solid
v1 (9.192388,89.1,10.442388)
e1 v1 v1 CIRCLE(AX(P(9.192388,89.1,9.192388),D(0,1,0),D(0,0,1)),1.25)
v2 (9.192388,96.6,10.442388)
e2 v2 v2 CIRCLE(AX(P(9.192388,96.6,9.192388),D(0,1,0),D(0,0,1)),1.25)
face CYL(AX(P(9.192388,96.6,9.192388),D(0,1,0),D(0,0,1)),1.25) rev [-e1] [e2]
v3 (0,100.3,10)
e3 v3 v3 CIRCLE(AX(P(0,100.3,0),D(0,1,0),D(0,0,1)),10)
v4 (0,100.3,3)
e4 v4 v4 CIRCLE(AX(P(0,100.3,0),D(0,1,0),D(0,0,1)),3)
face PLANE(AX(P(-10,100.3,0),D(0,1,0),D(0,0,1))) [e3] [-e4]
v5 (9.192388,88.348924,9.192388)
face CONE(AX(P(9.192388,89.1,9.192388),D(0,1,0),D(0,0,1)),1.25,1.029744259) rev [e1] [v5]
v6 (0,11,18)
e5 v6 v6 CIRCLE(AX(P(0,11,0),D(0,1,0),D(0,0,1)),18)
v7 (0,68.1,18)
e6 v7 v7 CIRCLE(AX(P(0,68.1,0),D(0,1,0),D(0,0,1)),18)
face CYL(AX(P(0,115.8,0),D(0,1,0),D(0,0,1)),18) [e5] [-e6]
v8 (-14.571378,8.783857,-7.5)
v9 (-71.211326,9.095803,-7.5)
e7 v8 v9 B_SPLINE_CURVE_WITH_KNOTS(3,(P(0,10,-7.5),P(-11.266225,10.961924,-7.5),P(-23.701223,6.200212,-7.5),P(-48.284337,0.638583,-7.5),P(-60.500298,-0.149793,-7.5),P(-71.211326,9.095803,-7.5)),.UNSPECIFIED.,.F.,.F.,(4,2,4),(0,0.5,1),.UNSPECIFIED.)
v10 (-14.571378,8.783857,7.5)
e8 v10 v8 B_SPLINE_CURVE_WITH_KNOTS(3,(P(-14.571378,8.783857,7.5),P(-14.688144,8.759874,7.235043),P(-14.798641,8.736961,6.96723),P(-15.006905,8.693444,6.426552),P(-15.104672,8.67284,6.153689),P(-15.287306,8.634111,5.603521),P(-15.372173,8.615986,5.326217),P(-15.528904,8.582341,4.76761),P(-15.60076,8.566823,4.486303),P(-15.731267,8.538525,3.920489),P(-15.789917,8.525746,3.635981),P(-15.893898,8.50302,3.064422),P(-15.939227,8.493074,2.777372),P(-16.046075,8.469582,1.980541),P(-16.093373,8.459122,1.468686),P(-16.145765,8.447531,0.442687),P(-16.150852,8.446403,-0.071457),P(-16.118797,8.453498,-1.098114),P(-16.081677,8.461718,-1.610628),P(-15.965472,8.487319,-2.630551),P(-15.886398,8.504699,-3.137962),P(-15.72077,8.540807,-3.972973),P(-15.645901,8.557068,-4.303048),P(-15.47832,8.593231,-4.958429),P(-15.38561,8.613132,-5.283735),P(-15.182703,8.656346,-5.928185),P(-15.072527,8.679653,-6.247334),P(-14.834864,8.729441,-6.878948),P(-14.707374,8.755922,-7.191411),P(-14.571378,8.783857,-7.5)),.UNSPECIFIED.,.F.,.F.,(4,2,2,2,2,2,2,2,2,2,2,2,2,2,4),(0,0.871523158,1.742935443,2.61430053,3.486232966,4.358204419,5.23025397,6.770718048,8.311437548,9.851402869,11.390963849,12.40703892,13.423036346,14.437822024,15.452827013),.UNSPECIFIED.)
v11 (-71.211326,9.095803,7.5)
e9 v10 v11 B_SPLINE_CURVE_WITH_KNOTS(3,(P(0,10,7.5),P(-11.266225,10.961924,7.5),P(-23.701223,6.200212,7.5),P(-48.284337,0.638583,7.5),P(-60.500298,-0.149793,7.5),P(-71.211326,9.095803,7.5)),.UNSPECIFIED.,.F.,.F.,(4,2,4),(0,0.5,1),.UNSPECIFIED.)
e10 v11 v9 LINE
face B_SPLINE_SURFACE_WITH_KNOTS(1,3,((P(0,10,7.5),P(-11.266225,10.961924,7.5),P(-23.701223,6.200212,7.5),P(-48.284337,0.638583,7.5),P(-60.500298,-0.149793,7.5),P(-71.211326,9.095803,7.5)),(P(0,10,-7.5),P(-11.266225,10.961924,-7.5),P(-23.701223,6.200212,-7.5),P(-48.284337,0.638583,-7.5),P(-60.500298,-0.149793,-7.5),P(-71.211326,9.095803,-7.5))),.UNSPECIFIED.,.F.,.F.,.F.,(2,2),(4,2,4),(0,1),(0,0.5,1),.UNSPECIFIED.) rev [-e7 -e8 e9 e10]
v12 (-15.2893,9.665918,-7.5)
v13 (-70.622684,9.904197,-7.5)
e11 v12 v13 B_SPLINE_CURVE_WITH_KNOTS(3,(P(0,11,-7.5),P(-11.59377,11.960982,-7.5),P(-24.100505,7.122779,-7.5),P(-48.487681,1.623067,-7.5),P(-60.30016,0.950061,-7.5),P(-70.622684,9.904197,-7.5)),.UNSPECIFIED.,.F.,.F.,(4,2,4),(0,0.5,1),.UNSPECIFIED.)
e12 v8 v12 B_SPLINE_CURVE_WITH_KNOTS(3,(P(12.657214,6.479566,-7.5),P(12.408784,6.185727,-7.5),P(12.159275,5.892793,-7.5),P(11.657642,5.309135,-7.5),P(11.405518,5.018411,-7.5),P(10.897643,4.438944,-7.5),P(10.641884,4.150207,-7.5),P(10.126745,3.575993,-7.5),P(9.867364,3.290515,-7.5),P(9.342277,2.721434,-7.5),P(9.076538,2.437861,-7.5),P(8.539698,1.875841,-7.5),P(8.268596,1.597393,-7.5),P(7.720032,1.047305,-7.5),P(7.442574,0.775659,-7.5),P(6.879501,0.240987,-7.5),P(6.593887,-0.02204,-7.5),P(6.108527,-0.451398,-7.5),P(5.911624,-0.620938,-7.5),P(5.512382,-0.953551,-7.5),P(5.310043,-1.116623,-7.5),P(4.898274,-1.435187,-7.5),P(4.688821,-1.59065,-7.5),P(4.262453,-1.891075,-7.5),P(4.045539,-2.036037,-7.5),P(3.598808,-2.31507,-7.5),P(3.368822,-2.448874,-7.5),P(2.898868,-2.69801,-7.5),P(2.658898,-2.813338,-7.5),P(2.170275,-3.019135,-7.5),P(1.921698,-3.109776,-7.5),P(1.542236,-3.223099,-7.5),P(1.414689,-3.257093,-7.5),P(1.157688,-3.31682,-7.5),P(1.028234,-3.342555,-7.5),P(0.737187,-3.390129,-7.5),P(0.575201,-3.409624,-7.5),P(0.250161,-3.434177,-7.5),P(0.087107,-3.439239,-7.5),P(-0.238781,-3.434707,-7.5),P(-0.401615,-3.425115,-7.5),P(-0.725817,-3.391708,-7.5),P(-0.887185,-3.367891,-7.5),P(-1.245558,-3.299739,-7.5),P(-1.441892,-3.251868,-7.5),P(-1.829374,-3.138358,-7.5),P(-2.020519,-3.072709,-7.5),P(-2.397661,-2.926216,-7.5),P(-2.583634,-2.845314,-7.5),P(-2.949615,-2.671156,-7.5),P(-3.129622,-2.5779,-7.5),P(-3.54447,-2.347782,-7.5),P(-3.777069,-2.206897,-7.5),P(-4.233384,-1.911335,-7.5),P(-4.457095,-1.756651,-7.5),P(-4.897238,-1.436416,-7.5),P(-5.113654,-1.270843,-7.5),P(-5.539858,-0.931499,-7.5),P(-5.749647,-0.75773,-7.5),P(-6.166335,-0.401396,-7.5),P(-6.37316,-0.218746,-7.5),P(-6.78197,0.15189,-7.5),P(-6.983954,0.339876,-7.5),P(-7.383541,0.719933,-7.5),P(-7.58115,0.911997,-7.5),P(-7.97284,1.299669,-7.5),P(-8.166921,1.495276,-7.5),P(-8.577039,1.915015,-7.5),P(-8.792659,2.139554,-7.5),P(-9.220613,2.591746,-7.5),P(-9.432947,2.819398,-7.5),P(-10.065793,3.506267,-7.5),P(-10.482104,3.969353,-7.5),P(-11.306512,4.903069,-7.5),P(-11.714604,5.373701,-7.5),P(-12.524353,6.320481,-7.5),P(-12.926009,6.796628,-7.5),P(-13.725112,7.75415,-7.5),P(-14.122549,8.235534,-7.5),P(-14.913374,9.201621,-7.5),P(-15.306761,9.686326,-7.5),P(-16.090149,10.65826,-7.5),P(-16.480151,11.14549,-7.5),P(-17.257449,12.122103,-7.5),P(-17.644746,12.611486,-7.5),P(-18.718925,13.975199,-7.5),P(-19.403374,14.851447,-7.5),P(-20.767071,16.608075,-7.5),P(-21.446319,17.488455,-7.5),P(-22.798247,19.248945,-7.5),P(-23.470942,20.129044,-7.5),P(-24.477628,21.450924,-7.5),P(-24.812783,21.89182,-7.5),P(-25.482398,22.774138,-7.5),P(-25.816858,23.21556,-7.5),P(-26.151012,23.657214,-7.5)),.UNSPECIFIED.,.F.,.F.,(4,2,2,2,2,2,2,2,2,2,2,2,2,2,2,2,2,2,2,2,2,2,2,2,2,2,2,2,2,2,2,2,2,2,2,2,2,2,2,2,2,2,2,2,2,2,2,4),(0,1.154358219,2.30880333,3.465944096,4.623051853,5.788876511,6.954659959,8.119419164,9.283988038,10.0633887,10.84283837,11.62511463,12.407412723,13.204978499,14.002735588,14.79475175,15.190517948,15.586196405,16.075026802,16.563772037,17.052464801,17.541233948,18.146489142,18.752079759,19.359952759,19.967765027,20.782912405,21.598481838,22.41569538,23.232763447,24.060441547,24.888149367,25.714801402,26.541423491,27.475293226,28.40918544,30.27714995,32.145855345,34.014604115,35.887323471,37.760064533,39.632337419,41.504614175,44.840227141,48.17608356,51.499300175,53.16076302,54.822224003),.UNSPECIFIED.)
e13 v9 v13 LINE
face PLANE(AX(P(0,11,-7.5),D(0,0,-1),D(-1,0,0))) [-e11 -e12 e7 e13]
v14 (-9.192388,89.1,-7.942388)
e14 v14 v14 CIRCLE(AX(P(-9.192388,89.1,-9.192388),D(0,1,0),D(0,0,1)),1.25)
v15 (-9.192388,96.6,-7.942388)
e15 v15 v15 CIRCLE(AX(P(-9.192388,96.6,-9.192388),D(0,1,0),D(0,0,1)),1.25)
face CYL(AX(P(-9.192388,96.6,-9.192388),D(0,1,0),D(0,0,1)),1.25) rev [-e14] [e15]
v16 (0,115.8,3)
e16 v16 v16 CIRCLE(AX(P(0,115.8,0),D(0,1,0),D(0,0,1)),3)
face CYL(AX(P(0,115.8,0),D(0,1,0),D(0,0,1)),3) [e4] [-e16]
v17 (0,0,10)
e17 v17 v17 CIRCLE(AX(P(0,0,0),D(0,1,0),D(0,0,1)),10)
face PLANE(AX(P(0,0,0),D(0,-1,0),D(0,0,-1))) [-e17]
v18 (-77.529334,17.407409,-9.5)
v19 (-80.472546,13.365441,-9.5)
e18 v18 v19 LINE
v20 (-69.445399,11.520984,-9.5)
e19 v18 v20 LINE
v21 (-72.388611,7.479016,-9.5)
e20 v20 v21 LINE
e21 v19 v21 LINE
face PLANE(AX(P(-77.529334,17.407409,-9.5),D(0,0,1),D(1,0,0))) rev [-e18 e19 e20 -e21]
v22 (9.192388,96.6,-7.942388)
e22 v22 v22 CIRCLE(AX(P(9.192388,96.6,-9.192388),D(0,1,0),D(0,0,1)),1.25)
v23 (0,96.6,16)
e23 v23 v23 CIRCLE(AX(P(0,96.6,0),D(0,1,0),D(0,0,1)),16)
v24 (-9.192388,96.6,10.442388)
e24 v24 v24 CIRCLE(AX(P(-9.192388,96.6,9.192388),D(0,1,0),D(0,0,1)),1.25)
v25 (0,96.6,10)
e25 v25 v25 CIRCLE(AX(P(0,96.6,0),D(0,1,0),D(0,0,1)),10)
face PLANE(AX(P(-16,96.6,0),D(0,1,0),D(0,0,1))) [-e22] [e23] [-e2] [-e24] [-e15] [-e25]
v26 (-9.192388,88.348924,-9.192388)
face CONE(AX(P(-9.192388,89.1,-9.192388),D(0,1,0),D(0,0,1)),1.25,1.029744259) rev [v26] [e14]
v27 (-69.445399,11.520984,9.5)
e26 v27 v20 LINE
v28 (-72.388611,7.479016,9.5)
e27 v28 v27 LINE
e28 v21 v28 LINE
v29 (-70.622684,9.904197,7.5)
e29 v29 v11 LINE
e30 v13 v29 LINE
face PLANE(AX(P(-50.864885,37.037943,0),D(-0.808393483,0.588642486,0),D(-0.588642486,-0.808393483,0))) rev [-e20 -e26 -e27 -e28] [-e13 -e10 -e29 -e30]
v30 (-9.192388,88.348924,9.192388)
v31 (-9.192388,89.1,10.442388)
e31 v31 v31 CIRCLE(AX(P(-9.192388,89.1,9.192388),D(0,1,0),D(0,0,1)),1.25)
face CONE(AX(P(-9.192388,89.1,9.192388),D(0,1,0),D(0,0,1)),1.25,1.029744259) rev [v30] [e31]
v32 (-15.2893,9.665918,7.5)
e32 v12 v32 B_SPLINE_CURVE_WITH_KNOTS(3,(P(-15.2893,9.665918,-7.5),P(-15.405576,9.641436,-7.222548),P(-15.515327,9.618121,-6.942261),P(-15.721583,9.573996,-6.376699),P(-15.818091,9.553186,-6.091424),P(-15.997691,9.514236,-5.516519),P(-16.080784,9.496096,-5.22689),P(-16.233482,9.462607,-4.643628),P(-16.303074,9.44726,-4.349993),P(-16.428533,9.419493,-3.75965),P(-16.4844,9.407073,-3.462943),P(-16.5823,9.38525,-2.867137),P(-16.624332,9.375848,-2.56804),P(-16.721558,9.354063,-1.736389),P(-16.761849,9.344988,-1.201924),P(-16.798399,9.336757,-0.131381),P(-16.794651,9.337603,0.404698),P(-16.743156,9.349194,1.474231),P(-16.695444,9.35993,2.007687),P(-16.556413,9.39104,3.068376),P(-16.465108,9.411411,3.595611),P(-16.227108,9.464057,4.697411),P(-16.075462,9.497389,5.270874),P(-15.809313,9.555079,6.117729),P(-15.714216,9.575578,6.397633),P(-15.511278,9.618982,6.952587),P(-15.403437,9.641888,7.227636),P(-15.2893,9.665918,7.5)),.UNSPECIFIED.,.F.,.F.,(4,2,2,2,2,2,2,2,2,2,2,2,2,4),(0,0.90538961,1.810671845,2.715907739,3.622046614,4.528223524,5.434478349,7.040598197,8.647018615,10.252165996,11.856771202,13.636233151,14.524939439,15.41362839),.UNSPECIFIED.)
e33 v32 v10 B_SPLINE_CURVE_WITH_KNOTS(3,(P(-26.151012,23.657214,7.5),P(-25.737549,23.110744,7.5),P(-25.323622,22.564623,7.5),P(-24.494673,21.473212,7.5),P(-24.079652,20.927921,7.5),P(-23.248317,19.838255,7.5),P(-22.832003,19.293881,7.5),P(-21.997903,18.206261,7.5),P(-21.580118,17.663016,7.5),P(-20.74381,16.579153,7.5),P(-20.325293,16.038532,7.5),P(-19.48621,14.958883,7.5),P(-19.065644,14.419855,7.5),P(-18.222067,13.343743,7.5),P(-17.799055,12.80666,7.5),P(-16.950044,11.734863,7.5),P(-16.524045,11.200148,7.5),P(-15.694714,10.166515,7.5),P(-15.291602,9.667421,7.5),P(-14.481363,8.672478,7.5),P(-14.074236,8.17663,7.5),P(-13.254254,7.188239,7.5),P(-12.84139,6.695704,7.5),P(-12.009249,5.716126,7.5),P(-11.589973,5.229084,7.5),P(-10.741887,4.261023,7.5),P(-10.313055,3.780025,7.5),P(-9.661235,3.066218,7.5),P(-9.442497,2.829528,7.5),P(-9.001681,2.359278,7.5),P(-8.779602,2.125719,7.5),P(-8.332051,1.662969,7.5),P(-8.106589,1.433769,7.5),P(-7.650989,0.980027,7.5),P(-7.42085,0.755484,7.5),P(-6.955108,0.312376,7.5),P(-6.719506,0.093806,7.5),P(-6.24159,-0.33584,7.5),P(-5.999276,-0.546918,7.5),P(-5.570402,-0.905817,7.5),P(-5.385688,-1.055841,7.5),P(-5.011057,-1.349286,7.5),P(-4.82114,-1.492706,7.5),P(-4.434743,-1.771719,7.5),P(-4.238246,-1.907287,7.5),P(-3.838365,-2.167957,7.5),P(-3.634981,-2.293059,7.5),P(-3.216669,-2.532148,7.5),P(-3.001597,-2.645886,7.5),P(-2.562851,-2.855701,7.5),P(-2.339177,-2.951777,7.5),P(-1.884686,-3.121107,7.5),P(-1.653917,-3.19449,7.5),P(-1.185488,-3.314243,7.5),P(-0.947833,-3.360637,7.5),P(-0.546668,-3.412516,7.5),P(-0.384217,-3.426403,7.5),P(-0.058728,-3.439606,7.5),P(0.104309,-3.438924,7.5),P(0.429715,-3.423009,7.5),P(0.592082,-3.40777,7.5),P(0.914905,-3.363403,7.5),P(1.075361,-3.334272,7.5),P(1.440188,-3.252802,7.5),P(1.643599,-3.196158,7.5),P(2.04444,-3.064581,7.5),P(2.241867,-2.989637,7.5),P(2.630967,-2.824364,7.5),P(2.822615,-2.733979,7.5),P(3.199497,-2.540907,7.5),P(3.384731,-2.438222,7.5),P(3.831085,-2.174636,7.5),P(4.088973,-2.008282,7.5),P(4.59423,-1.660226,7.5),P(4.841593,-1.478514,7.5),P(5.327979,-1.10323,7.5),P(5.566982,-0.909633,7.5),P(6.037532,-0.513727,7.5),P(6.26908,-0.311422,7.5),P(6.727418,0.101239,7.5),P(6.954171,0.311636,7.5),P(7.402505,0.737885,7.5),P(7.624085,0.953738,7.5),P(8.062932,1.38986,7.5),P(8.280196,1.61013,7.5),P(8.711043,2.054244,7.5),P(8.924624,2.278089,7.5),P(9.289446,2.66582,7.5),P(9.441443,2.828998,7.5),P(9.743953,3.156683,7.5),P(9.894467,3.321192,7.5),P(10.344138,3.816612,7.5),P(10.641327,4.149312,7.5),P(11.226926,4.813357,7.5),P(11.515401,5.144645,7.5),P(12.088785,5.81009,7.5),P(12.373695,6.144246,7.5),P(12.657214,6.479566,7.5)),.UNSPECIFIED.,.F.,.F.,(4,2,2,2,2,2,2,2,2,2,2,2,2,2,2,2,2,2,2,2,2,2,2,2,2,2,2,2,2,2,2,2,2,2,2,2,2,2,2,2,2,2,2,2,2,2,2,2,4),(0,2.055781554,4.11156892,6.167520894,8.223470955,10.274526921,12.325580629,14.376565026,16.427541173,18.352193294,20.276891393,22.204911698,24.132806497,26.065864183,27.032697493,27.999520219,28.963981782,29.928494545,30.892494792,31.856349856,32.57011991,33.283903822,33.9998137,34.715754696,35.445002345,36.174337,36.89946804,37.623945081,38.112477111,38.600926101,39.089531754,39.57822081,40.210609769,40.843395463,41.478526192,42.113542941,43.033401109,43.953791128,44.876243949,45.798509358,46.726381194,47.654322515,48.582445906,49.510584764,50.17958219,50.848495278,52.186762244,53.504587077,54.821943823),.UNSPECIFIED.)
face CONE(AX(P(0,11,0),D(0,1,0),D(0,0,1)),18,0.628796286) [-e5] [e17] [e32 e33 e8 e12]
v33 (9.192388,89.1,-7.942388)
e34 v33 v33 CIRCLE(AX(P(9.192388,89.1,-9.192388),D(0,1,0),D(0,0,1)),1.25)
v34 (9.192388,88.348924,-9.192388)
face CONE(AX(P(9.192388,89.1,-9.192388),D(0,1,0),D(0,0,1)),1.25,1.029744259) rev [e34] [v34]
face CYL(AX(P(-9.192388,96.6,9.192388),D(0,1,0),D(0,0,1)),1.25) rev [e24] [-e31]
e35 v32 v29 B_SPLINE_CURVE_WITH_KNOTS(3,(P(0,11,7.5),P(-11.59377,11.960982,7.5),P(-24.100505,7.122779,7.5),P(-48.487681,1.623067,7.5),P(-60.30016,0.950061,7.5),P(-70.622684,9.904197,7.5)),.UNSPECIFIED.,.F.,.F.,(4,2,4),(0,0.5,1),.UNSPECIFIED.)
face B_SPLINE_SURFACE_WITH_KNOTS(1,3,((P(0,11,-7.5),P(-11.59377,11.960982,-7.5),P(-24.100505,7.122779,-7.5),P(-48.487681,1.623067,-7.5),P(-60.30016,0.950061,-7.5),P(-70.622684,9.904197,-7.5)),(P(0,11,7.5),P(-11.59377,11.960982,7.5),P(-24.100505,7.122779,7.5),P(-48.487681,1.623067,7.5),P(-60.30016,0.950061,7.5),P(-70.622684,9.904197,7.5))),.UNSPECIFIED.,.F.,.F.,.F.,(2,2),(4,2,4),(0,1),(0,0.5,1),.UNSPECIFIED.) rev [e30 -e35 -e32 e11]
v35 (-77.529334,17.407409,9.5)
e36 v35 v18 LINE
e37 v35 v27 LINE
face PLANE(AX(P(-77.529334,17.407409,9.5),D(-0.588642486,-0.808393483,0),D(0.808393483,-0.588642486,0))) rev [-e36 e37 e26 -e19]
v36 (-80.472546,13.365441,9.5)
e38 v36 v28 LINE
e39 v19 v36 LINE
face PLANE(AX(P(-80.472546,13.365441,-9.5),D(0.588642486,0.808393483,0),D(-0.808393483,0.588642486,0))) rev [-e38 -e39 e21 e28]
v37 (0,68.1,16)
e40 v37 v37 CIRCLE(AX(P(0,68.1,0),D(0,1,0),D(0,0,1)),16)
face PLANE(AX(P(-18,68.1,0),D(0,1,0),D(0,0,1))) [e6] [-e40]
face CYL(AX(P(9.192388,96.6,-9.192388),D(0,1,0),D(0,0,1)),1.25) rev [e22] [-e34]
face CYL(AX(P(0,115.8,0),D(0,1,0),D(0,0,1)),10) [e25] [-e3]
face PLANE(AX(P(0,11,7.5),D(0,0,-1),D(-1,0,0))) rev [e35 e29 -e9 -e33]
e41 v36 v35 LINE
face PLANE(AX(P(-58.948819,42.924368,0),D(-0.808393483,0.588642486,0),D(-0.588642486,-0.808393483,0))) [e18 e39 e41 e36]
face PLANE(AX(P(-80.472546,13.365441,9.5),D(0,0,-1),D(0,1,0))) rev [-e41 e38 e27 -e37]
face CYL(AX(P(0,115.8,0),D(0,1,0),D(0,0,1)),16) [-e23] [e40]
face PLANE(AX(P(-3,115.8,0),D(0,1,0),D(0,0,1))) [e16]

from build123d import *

# Parameters (mm, degrees)
SWEEP1_START              = -7.5
SWEEP1_DEPTH              = 15
SKETCH4_W                 = 19
SKETCH4_H                 = 5
BOSS_EXTRUDE1_DEPTH       = 10
M3X0_5_TAPPED_HOLE1_D     = 2.5
M3X0_5_TAPPED_HOLE1_DEPTH = 7.5
M3X0_5_TAPPED_HOLE1_TIP   = 0.751075774


with BuildPart() as part:
    # Sketch1 → Revolve1 (revolve)
    with BuildSketch(Plane.XY, mode=Mode.PRIVATE) as revolve1_sk:
        Polygon((0, 0), (-10, 0), (-18, 11), (-18, 68.1), (-16, 68.1), (-16, 96.6), (-10, 96.6), (-10, 100.3), (-3, 100.3), (-3, 115.8), (0, 115.8), align=None)
    revolve(revolve1_sk.sketch.rotate(Axis((0, 115.8, 0), (0, -1, 0)), 270), axis=Axis((0, 115.8, 0), (0, -1, 0)))

    # Sweep1: read off the stored shape, not the designer's step
    # Sweep1 outline → Sweep1 (add)
    with BuildSketch(Plane.XY.offset(SWEEP1_START)):
        with BuildLine():
            add(Edge.make_bspline(
                [(-15.28930073, 9.665917189), (-15.155241069, 9.50042506), (-15.020974619, 9.335100438), (-14.781588664, 9.041143621), (-14.67655559, 8.912441119), (-14.571379426, 8.783855646)],
                knots=[17.713260558, 17.713260558, 17.713260558, 17.713260558, 18.352193294, 18.352193294, 18.850555217, 18.850555217, 18.850555217, 18.850555217], degree=3))
            add(Edge.make_bspline(
                [(-15.28930073, 9.665917189), (-22.240343975, 8.202614741), (-29.318460029, 5.946043988), (-48.487680613, 1.623066579), (-60.300160331, 0.950060594), (-70.622683773, 9.904196742)],
                knots=[0.213963068, 0.213963068, 0.213963068, 0.213963068, 0.5, 0.5, 1, 1, 1, 1], degree=3))
            Line((-70.622683773, 9.904196742), (-71.211326259, 9.095803258))
            add(Edge.make_bspline(
                [(-14.571379426, 8.783855646), (-21.586501057, 7.343246642), (-28.814104178, 5.043485332), (-48.284336953, 0.638583113), (-60.500298128, -0.149792653), (-71.211326259, 9.095803258)],
                knots=[0.207983451, 0.207983451, 0.207983451, 0.207983451, 0.5, 0.5, 1, 1, 1, 1], degree=3))
        make_face()
    extrude(amount=SWEEP1_DEPTH)

    # Sketch4 → Boss-Extrude1 (add)
    with BuildSketch(Plane(origin=(-50.864884567, 37.037943446, 0), x_dir=(0, 0, 1), z_dir=(-0.8083934830959073, 0.5886424861391397, 0))):
        with Locations((0, -34.065024053)):
            Rectangle(SKETCH4_W, SKETCH4_H)
    extrude(amount=BOSS_EXTRUDE1_DEPTH)

    # M3x0.5 Tapped Hole1
    with Locations(Plane(origin=(0, 96.6, 0), x_dir=(1, 0, 0), z_dir=(0, 1, 0))):
        with Locations((9.192388155, 9.192388155), (9.192388155, -9.192388155), (-9.192388155, -9.192388155), (-9.192388155, 9.192388155)):
            Hole(M3X0_5_TAPPED_HOLE1_D / 2, depth=M3X0_5_TAPPED_HOLE1_DEPTH)
            with Locations((0, 0, -(M3X0_5_TAPPED_HOLE1_DEPTH + M3X0_5_TAPPED_HOLE1_TIP / 2))):  # 118° drill point
                Cone(0, M3X0_5_TAPPED_HOLE1_D / 2, M3X0_5_TAPPED_HOLE1_TIP, mode=Mode.SUBTRACT)


solid = part.part
